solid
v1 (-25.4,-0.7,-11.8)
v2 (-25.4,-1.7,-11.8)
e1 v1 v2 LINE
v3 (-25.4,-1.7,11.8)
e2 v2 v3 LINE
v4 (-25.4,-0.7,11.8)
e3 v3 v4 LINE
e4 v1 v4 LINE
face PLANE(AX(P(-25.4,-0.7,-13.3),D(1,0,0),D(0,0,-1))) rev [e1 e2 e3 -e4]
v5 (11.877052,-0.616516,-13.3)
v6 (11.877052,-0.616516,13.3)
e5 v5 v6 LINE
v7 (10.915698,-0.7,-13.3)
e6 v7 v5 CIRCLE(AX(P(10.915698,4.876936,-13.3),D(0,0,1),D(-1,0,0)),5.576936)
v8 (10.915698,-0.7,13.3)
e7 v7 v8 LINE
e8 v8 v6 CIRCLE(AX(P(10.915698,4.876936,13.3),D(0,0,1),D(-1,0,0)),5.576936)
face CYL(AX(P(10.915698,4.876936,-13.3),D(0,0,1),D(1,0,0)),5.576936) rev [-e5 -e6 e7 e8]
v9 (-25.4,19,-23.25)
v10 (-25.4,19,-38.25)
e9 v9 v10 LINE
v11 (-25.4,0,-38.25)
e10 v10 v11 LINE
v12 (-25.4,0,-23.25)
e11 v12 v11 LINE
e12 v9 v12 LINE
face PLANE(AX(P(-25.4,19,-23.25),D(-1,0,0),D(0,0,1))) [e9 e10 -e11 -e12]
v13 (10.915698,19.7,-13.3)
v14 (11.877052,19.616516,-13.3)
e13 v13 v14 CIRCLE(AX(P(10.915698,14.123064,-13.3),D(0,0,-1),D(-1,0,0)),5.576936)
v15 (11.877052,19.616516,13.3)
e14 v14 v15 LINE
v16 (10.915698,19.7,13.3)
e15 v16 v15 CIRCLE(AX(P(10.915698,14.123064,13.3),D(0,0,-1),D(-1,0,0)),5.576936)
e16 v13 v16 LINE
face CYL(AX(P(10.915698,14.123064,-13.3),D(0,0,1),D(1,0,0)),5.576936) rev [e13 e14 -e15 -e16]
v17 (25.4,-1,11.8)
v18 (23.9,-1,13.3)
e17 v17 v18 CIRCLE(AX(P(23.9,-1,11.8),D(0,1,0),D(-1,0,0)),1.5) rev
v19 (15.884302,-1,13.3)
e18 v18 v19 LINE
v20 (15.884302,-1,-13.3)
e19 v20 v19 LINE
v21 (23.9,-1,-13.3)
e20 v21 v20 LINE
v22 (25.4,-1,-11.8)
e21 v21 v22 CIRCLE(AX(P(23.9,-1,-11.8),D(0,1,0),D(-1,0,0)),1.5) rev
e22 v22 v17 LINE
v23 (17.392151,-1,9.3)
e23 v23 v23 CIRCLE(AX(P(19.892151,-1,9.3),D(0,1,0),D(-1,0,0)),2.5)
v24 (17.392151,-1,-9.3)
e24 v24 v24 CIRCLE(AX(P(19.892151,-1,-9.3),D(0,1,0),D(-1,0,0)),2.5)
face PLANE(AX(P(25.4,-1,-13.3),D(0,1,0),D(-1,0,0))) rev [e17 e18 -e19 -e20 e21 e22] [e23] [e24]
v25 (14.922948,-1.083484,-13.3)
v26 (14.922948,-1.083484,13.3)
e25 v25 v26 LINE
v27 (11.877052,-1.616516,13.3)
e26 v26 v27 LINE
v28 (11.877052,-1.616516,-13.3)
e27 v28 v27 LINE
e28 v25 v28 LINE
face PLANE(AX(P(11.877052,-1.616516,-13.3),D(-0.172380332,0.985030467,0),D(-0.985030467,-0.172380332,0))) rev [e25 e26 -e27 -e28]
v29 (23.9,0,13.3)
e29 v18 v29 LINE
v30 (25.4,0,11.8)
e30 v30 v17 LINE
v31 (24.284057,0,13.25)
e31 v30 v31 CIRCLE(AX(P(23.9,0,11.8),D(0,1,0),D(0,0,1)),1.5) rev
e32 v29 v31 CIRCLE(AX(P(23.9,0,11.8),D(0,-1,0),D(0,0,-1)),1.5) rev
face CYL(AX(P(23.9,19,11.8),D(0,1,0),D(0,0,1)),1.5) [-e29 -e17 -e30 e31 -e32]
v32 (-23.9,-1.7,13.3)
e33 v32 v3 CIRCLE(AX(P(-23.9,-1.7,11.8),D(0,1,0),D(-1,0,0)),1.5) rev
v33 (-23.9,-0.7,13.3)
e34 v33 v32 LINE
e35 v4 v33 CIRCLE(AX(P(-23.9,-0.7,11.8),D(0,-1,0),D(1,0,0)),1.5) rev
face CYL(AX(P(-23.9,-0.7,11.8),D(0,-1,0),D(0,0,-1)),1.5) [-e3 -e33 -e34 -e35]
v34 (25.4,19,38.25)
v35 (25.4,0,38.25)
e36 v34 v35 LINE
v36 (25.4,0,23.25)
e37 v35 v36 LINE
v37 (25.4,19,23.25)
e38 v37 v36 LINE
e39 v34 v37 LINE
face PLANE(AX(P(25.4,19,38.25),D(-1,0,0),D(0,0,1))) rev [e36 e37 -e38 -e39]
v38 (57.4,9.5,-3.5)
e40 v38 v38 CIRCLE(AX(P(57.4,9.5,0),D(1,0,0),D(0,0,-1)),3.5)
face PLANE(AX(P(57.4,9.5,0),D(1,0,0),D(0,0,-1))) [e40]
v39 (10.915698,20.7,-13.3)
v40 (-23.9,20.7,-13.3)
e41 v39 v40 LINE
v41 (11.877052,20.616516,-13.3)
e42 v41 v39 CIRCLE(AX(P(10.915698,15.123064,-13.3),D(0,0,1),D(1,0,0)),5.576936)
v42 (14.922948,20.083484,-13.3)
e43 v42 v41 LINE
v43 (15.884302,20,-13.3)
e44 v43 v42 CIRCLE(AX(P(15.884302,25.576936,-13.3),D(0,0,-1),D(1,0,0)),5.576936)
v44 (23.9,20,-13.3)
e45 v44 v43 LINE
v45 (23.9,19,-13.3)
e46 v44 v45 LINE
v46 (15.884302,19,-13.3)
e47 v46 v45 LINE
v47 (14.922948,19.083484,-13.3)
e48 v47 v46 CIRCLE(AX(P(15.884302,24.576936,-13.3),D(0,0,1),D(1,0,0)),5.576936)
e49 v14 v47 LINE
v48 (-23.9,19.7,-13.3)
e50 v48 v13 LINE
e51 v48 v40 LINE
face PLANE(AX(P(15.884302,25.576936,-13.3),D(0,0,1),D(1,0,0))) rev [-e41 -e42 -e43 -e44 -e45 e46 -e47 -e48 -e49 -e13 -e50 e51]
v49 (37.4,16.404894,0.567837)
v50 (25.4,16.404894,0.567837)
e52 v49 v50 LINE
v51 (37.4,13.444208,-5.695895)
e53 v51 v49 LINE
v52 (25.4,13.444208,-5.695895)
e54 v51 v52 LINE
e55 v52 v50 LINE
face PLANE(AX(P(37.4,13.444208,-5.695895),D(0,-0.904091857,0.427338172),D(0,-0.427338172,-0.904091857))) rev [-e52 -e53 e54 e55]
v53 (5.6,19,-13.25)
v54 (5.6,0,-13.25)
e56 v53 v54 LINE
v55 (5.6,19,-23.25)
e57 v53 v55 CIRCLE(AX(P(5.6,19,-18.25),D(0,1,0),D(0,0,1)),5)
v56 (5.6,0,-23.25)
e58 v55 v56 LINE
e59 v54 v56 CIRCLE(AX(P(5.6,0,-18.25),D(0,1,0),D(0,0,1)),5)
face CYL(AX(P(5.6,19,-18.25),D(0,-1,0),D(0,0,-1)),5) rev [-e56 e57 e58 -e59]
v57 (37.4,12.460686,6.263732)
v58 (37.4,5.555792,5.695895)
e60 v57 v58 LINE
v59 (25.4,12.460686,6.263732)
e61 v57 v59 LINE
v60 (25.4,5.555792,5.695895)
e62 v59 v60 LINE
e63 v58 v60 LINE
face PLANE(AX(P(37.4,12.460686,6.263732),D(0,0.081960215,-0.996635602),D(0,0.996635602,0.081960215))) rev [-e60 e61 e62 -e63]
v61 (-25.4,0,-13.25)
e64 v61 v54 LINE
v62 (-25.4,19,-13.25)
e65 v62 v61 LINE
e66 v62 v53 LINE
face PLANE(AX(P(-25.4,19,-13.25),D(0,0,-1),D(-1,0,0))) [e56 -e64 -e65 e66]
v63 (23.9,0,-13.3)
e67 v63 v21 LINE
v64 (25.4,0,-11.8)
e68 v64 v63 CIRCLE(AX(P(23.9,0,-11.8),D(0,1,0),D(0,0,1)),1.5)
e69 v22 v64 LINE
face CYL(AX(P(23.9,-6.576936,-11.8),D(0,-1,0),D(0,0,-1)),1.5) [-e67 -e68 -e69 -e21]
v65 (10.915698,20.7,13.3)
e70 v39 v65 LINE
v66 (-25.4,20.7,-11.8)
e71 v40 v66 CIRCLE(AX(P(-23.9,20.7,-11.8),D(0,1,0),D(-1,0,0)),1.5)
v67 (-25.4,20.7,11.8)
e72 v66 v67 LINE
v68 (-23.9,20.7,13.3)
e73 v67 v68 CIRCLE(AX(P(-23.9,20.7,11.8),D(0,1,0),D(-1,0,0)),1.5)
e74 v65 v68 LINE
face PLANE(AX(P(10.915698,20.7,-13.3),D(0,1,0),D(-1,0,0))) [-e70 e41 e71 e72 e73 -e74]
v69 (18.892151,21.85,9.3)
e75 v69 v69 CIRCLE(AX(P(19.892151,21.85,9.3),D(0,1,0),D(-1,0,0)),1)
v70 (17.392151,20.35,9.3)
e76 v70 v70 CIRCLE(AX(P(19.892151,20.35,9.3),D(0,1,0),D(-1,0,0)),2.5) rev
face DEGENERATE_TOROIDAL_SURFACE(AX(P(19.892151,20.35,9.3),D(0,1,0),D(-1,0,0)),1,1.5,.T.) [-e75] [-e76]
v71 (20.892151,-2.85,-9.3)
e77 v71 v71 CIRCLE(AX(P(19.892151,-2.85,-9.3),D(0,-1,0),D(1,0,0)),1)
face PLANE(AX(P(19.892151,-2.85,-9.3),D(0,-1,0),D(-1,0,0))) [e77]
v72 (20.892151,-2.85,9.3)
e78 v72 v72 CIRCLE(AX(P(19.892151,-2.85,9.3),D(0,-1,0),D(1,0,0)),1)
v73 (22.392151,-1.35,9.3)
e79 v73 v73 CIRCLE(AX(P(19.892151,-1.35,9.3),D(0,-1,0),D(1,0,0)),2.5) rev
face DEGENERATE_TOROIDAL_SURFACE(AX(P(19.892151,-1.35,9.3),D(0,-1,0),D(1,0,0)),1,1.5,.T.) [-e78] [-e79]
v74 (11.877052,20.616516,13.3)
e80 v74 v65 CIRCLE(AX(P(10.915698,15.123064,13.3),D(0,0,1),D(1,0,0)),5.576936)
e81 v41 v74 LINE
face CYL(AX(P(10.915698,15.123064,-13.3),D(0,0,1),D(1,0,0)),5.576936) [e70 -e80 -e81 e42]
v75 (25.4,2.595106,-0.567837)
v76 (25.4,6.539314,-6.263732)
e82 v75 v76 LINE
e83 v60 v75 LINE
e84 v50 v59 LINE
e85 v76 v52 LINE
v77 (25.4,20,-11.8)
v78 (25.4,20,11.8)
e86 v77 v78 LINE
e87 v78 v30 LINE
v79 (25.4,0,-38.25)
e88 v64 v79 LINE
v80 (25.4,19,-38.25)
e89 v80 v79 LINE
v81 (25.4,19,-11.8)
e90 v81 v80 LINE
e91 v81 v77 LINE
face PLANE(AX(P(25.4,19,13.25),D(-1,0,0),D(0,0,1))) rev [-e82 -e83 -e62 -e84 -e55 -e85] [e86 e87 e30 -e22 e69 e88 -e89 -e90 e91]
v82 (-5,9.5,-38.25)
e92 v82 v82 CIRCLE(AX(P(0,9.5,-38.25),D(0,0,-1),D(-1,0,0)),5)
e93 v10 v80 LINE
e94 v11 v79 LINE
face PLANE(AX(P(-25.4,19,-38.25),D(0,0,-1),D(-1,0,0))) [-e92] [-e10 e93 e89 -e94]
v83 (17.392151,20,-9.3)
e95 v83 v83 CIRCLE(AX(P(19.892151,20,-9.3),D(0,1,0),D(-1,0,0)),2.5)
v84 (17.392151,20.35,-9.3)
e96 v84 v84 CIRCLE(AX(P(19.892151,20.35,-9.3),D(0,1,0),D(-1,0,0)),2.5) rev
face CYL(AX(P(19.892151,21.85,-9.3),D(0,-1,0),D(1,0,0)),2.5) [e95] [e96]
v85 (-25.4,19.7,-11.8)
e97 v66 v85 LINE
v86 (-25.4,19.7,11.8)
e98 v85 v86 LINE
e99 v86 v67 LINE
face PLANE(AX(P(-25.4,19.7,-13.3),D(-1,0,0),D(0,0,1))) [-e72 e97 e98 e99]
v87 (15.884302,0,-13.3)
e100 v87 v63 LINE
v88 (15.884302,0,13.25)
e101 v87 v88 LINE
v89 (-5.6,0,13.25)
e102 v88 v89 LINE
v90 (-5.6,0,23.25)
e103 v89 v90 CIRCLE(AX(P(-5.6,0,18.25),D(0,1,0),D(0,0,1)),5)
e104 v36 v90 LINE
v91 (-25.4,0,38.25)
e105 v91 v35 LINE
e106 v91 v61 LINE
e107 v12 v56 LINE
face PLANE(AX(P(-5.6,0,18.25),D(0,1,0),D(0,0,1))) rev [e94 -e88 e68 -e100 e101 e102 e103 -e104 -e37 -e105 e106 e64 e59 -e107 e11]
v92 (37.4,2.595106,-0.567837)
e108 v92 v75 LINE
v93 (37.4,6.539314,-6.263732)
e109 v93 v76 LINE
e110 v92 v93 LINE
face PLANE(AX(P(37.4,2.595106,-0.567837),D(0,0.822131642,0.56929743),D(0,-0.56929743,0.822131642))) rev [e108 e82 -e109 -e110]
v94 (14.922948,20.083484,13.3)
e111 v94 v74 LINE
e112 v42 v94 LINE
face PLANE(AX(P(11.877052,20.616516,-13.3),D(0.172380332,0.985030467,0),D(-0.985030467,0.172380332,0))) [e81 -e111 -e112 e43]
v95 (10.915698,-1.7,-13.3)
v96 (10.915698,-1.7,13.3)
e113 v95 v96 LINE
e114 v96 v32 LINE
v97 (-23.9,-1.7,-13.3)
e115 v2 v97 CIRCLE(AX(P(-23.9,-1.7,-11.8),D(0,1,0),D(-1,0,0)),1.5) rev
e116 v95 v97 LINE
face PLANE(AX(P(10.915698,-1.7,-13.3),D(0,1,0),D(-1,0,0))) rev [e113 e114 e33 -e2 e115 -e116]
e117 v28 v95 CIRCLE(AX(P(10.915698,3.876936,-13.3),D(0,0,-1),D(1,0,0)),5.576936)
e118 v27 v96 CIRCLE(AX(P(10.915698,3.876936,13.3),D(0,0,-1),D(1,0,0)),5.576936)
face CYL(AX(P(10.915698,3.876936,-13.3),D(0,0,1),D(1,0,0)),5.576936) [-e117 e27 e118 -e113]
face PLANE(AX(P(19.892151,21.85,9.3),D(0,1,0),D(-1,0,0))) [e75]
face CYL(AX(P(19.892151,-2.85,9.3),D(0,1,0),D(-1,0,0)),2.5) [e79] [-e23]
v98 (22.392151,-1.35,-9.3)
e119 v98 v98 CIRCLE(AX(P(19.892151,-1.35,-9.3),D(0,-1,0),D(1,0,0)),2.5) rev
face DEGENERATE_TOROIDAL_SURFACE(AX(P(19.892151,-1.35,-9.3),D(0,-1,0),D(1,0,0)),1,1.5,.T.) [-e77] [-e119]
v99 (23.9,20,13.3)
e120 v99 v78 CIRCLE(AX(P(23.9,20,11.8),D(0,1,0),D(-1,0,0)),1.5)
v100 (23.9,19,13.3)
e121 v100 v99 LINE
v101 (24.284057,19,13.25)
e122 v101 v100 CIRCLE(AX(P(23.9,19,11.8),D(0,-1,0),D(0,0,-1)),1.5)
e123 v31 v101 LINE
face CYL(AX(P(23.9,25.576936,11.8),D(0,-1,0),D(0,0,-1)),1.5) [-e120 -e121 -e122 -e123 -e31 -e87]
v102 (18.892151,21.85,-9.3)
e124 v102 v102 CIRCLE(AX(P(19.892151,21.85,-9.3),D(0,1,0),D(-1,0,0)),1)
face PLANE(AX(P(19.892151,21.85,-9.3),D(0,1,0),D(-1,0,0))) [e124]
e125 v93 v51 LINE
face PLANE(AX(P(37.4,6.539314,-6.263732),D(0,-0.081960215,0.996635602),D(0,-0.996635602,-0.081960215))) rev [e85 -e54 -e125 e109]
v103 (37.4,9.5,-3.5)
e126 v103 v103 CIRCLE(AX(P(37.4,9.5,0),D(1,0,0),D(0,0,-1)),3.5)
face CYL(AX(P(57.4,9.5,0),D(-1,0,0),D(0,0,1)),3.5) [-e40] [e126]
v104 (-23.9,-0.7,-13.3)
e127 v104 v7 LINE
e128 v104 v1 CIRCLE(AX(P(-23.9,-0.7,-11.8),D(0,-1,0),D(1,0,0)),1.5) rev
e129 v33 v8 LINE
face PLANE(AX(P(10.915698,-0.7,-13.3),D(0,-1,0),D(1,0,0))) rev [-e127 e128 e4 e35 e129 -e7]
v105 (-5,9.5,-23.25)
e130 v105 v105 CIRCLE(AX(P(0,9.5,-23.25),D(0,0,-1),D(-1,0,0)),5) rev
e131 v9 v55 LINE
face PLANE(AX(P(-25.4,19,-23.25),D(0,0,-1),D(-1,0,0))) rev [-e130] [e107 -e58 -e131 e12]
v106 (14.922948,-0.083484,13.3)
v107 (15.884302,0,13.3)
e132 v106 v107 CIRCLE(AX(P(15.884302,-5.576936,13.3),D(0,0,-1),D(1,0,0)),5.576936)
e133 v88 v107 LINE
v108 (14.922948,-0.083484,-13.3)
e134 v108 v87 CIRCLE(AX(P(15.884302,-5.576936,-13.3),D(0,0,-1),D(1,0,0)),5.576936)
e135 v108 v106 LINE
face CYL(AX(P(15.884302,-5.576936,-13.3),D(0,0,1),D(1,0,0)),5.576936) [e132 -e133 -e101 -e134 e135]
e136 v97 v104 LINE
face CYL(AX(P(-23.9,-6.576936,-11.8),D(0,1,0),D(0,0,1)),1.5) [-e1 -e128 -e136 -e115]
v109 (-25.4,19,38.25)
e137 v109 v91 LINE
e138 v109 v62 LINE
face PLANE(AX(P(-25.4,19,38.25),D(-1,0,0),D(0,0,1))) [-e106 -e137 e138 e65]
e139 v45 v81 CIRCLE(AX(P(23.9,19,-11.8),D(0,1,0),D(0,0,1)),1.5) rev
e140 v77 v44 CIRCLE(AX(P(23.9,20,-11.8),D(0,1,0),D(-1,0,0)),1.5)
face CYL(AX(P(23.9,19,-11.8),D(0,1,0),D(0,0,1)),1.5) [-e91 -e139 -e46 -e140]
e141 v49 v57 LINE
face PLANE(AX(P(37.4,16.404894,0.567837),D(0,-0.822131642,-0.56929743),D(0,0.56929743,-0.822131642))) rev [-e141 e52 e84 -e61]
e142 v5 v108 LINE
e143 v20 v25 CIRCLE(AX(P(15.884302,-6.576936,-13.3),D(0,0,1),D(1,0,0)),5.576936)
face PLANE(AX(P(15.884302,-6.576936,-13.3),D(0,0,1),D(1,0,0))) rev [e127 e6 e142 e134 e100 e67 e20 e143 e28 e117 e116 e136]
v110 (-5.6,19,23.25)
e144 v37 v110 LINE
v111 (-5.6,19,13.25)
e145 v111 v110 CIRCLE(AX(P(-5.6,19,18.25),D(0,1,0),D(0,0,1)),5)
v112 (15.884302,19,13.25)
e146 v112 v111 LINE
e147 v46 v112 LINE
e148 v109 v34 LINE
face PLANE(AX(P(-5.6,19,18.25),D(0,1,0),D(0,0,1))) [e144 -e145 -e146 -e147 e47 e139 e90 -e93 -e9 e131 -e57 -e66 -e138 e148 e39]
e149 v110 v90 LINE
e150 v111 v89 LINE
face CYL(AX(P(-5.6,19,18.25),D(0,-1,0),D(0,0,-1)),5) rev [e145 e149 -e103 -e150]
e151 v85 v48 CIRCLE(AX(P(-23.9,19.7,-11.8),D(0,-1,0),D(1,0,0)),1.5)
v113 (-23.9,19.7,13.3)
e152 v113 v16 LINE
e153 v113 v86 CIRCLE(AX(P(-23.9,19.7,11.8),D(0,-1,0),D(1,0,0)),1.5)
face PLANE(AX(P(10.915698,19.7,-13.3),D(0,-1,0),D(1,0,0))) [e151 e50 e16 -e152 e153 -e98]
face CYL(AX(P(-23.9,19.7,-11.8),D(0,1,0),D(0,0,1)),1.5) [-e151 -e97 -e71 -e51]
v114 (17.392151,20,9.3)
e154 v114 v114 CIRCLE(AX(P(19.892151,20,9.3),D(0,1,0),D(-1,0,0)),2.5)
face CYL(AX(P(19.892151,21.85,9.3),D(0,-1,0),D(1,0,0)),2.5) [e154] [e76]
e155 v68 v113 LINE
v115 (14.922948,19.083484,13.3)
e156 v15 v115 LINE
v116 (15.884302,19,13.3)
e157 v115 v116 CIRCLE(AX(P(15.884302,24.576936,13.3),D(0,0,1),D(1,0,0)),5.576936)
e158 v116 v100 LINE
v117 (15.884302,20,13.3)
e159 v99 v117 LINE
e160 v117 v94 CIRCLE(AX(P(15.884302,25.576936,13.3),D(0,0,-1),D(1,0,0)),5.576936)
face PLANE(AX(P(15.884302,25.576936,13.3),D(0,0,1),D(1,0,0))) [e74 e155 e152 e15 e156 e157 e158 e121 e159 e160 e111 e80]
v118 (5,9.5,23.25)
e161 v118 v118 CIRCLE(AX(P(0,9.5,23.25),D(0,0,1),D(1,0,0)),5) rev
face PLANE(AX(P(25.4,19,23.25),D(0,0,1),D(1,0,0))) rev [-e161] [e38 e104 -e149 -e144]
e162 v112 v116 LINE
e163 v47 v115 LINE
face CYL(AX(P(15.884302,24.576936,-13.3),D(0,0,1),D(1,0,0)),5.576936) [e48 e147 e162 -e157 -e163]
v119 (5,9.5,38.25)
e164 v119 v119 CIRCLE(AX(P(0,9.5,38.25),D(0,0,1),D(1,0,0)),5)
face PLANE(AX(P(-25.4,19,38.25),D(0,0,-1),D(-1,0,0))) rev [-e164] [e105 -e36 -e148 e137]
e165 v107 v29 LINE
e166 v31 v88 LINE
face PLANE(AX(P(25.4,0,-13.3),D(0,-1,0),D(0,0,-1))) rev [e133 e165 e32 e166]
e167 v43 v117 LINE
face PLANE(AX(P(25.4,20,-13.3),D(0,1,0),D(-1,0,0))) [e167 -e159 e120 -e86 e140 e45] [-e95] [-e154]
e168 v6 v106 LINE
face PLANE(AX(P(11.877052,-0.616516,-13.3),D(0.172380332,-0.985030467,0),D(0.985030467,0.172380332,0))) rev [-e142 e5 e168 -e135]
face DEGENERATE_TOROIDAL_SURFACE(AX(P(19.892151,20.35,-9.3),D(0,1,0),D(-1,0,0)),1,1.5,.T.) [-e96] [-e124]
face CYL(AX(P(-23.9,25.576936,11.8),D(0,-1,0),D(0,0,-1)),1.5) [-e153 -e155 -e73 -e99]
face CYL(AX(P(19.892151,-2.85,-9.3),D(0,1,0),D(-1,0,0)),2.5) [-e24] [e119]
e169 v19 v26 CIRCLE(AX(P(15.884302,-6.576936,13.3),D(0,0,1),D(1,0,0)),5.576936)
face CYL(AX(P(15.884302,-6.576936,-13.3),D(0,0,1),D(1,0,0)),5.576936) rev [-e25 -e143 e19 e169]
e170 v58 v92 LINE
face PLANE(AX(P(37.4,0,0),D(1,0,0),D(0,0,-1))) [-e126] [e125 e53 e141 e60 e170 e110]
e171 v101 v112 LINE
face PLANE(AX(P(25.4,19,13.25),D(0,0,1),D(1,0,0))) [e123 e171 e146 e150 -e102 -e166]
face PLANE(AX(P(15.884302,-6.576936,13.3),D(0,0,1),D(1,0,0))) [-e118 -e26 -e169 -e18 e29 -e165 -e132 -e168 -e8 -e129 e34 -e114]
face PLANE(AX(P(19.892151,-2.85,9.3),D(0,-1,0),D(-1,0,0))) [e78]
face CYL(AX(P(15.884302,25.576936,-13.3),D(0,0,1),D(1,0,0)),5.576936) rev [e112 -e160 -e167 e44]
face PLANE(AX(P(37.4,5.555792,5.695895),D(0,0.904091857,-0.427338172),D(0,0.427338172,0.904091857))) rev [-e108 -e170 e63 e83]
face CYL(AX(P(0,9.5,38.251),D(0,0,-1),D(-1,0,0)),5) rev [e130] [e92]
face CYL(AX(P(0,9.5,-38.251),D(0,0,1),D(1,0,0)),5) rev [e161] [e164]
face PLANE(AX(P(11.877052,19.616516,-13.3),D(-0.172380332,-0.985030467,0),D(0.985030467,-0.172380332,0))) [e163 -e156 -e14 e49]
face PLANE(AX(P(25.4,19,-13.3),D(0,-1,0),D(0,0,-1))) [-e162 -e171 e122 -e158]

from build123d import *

# Parameters (mm, degrees)
SALIENTE_EXTRUIR1_DEPTH = 19
CORTAR_EXTRUIR1_REACH   = 84.816
CROQUIS2_R              = 5
CORTAR_EXTRUIR2_REACH   = 84.816
CROQUIS3_R              = 5
SALIENTE_EXTRUIR2_DEPTH = 12
CROQUIS5_R              = 3.5
SALIENTE_EXTRUIR3_DEPTH = 20
SALIENTE_EXTRUIR4_DEPTH = 13.3
REDONDEO1_R             = 1.5
CROQUIS8_R              = 2.5
SALIENTE_EXTRUIR5_DEPTH = 1.85
REDONDEO2_R             = 1.5
SIMETR_A1_START         = -1.3500001
SIMETR_A1_OUTLINE_R     = 2.5
SIMETR_A1_DEPTH         = 1.3500001
SIMETR_A1_START_2       = -13.3
SIMETR_A1_2_DEPTH       = 26.6
SIMETR_A1_START_3       = -3
SIMETR_A1_5_DEPTH       = 3


with BuildPart() as part:
    # Croquis1 → Saliente-Extruir1 (new body)
    with BuildSketch(Plane(origin=(0, 0, 0), x_dir=(1, 0, 0), z_dir=(0, 1, 0))):
        with BuildLine():
            Line((-25.4, 23.25), (-25.4, 38.25))
            Line((-25.4, 38.25), (25.4, 38.25))
            Line((25.4, 38.25), (25.4, -13.25))
            Line((25.4, -13.25), (-5.6, -13.25))
            ThreePointArc((-5.6, -13.25), (-10.6, -18.25), (-5.6, -23.25))
            Line((-5.6, -23.25), (25.4, -23.25))
            Line((25.4, -23.25), (25.4, -38.25))
            Line((25.4, -38.25), (-25.4, -38.25))
            Line((-25.4, -38.25), (-25.4, 13.25))
            Line((-25.4, 13.25), (5.6, 13.25))
            ThreePointArc((5.6, 13.25), (10.6, 18.25), (5.6, 23.25))
            Line((5.6, 23.25), (-25.4, 23.25))
        make_face()
    extrude(amount=SALIENTE_EXTRUIR1_DEPTH)

    # Croquis2 → Cortar-Extruir1 (cut, up to next)
    with BuildSketch(Plane(origin=(0, 0, -38.25), x_dir=(-1, 0, 0), z_dir=(0, 0, -1)), mode=Mode.PRIVATE) as cortar_extruir1_sk1:
        with Locations((0, 9.5)):
            Circle(CROQUIS2_R)
    cortar_extruir1_tool1 = extrude(cortar_extruir1_sk1.sketch, amount=-CORTAR_EXTRUIR1_REACH, mode=Mode.PRIVATE) & part.part
    add(cortar_extruir1_tool1.solids().sort_by_distance((0, 9.5, -38.25))[0], mode=Mode.SUBTRACT)

    # Croquis3 → Cortar-Extruir2 (cut, up to next)
    with BuildSketch(Plane.XY.offset(38.25), mode=Mode.PRIVATE) as cortar_extruir2_sk1:
        with Locations(Location((0, 9.5, 0), (0, 0, 180))):
            Circle(CROQUIS3_R)
    cortar_extruir2_tool1 = extrude(cortar_extruir2_sk1.sketch, amount=-CORTAR_EXTRUIR2_REACH, mode=Mode.PRIVATE) & part.part
    add(cortar_extruir2_tool1.solids().sort_by_distance((0, 9.5, 38.25))[0], mode=Mode.SUBTRACT)

    # Croquis4 → Saliente-Extruir2 (add)
    with BuildSketch(Plane(origin=(25.4, 0, 0), x_dir=(0, 0, -1), z_dir=(1, 0, 0))):
        Polygon((0.567837029, 2.595106003), (6.263732126, 6.539314294), (5.695895097, 13.444208291), (-0.567837029, 16.404893997), (-6.263732126, 12.460685706), (-5.695895097, 5.555791709), align=None)
    extrude(amount=SALIENTE_EXTRUIR2_DEPTH)

    # Croquis5 → Saliente-Extruir3 (add)
    with BuildSketch(Plane(origin=(37.4, 0, 0), x_dir=(0, 0, -1), z_dir=(1, 0, 0))):
        with Locations((0, 9.5)):
            Circle(CROQUIS5_R)
    extrude(amount=SALIENTE_EXTRUIR3_DEPTH)

    # Croquis6 → Saliente-Extruir4 (add, symmetric)
    with BuildSketch(Plane.XY):
        with BuildLine():
            Line((25.4, 19), (15.884301947, 19))
            ThreePointArc((15.884301947, 19), (15.401815848, 19.020910233), (14.922947827, 19.08348413))
            Line((14.922947827, 19.08348413), (11.877052173, 19.61651587))
            ThreePointArc((11.877052173, 19.61651587), (11.398184152, 19.679089767), (10.915698053, 19.7))
            Line((10.915698053, 19.7), (-25.4, 19.7))
            Line((-25.4, 19.7), (-25.4, 20.7))
            Line((-25.4, 20.7), (10.915698053, 20.7))
            ThreePointArc((10.915698053, 20.7), (11.398184152, 20.679089767), (11.877052173, 20.61651587))
            Line((11.877052173, 20.61651587), (14.922947827, 20.08348413))
            ThreePointArc((14.922947827, 20.08348413), (15.401815848, 20.020910233), (15.884301947, 20))
            Line((15.884301947, 20), (25.4, 20))
            Line((25.4, 20), (25.4, 19))
        make_face()
    extrude(amount=SALIENTE_EXTRUIR4_DEPTH, both=True)

    # Redondeo1
    redondeo1_edges = [part.edges().sort_by_distance(p)[0] for p in [
        (-25.4, 20.2, -13.3),
        (-25.4, 20.2, 13.3),
        (25.4, 19.5, 13.3),
        (25.4, 19.5, -13.3),
    ]]
    fillet(redondeo1_edges, radius=REDONDEO1_R)

    # Croquis8 → Saliente-Extruir5 (add)
    with BuildSketch(Plane(origin=(0, 20, 0), x_dir=(1, 0, 0), z_dir=(0, 1, 0))):
        with Locations(Location((19.892150974, 9.3, 0), (0, 0, 180))):
            Circle(CROQUIS8_R)
        with Locations(Location((19.892150974, -9.3, 0), (0, 0, 180))):
            Circle(CROQUIS8_R)
    extrude(amount=SALIENTE_EXTRUIR5_DEPTH)

    # Redondeo2
    redondeo2_edges = [part.edges().sort_by_distance(p)[0] for p in [
        (22.392150974, 21.85, -9.3),
        (22.392150974, 21.85, 9.3),
    ]]
    fillet(redondeo2_edges, radius=REDONDEO2_R)

    # Simetría1: read off the stored shape, not the designer's step
    # Simetría1 outline → Simetría1 (add)
    with BuildSketch(Plane(origin=(0, 0, 0), x_dir=(1, 0, 0), z_dir=(0, 1, 0)).offset(SIMETR_A1_START)):
        with Locations((19.892150974, 9.3)):
            Circle(SIMETR_A1_OUTLINE_R)
        with Locations((19.892150974, -9.3)):
            Circle(SIMETR_A1_OUTLINE_R)
    extrude(amount=SIMETR_A1_DEPTH)

    # Simetr_a1 2 outline → Simetr_a1 2 (add)
    with BuildSketch(Plane.XY.offset(SIMETR_A1_START_2)):
        with BuildLine():
            Line((-25.4, -0.7), (-25.4, -1.7))
            Line((-25.4, -1.7), (10.915698053, -1.7))
            ThreePointArc((10.915698053, -1.7), (11.398184152, -1.679089767), (11.877052173, -1.61651587))
            Line((11.877052173, -1.61651587), (14.922947827, -1.08348413))
            ThreePointArc((14.922947827, -1.08348413), (15.401815848, -1.020910233), (15.884301947, -1))
            Line((15.884301947, -1), (25.4, -1))
            Line((25.4, -1), (25.4, 0))
            Line((25.4, 0), (15.884301947, 0))
            ThreePointArc((15.884301947, 0), (15.401815848, -0.020910233), (14.922947827, -0.08348413))
            Line((14.922947827, -0.08348413), (11.877052173, -0.61651587))
            ThreePointArc((11.877052173, -0.61651587), (11.398184152, -0.679089767), (10.915698053, -0.7))
            Line((10.915698053, -0.7), (-25.4, -0.7))
        make_face()
    extrude(amount=SIMETR_A1_2_DEPTH)

    # Simetr_a1 3 outline → Simetr_a1 3 (revolve)
    with BuildSketch(Plane(origin=(19.892150974, 0, -9.3), x_dir=(1, 0, 0), z_dir=(0, 0, 1))):
        with BuildLine():
            Line((0, -1.35), (0, -2.85))
            Line((0, -2.85), (1, -2.85))
            ThreePointArc((1, -2.85), (2.060660172, -2.410660172), (2.5, -1.35))
            Line((2.5, -1.35), (0, -1.35))
        make_face()
    revolve(axis=Axis((19.892150974, 0, -9.3), (0, 1, 0)))

    # Simetr_a1 4 outline → Simetr_a1 4 (revolve)
    with BuildSketch(Plane(origin=(19.892150974, 0, 9.3), x_dir=(1, 0, 0), z_dir=(0, 0, 1))):
        with BuildLine():
            Line((0, -1.35), (0, -2.85))
            Line((0, -2.85), (1, -2.85))
            ThreePointArc((1, -2.85), (2.060660172, -2.410660172), (2.5, -1.35))
            Line((2.5, -1.35), (0, -1.35))
        make_face()
    revolve(axis=Axis((19.892150974, 0, 9.3), (0, 1, 0)))

    # Simetr_a1 5 outline → Simetr_a1 5 (cut)
    with BuildSketch(Plane(origin=(0, 0, 0), x_dir=(1, 0, 0), z_dir=(0, 1, 0)).offset(SIMETR_A1_START_3)):
        with BuildLine():
            ThreePointArc((-25.4, 11.8), (-24.960660172, 12.860660172), (-23.9, 13.3))
            Line((-23.9, 13.3), (-25.4, 13.3))
            Line((-25.4, 13.3), (-25.4, 11.8))
        make_face()
        with BuildLine():
            Line((25.4, 13.3), (23.9, 13.3))
            ThreePointArc((23.9, 13.3), (24.960660172, 12.860660172), (25.4, 11.8))
            Line((25.4, 11.8), (25.4, 13.3))
        make_face()
        with BuildLine():
            ThreePointArc((-23.9, -13.3), (-24.960660172, -12.860660172), (-25.4, -11.8))
            Line((-25.4, -11.8), (-25.4, -13.3))
            Line((-25.4, -13.3), (-23.9, -13.3))
        make_face()
        with BuildLine():
            Line((25.4, -13.3), (25.4, -11.8))
            ThreePointArc((25.4, -11.8), (24.960660172, -12.860660172), (23.9, -13.3))
            Line((23.9, -13.3), (25.4, -13.3))
        make_face()
    extrude(amount=SIMETR_A1_5_DEPTH, mode=Mode.SUBTRACT)


solid = part.part
